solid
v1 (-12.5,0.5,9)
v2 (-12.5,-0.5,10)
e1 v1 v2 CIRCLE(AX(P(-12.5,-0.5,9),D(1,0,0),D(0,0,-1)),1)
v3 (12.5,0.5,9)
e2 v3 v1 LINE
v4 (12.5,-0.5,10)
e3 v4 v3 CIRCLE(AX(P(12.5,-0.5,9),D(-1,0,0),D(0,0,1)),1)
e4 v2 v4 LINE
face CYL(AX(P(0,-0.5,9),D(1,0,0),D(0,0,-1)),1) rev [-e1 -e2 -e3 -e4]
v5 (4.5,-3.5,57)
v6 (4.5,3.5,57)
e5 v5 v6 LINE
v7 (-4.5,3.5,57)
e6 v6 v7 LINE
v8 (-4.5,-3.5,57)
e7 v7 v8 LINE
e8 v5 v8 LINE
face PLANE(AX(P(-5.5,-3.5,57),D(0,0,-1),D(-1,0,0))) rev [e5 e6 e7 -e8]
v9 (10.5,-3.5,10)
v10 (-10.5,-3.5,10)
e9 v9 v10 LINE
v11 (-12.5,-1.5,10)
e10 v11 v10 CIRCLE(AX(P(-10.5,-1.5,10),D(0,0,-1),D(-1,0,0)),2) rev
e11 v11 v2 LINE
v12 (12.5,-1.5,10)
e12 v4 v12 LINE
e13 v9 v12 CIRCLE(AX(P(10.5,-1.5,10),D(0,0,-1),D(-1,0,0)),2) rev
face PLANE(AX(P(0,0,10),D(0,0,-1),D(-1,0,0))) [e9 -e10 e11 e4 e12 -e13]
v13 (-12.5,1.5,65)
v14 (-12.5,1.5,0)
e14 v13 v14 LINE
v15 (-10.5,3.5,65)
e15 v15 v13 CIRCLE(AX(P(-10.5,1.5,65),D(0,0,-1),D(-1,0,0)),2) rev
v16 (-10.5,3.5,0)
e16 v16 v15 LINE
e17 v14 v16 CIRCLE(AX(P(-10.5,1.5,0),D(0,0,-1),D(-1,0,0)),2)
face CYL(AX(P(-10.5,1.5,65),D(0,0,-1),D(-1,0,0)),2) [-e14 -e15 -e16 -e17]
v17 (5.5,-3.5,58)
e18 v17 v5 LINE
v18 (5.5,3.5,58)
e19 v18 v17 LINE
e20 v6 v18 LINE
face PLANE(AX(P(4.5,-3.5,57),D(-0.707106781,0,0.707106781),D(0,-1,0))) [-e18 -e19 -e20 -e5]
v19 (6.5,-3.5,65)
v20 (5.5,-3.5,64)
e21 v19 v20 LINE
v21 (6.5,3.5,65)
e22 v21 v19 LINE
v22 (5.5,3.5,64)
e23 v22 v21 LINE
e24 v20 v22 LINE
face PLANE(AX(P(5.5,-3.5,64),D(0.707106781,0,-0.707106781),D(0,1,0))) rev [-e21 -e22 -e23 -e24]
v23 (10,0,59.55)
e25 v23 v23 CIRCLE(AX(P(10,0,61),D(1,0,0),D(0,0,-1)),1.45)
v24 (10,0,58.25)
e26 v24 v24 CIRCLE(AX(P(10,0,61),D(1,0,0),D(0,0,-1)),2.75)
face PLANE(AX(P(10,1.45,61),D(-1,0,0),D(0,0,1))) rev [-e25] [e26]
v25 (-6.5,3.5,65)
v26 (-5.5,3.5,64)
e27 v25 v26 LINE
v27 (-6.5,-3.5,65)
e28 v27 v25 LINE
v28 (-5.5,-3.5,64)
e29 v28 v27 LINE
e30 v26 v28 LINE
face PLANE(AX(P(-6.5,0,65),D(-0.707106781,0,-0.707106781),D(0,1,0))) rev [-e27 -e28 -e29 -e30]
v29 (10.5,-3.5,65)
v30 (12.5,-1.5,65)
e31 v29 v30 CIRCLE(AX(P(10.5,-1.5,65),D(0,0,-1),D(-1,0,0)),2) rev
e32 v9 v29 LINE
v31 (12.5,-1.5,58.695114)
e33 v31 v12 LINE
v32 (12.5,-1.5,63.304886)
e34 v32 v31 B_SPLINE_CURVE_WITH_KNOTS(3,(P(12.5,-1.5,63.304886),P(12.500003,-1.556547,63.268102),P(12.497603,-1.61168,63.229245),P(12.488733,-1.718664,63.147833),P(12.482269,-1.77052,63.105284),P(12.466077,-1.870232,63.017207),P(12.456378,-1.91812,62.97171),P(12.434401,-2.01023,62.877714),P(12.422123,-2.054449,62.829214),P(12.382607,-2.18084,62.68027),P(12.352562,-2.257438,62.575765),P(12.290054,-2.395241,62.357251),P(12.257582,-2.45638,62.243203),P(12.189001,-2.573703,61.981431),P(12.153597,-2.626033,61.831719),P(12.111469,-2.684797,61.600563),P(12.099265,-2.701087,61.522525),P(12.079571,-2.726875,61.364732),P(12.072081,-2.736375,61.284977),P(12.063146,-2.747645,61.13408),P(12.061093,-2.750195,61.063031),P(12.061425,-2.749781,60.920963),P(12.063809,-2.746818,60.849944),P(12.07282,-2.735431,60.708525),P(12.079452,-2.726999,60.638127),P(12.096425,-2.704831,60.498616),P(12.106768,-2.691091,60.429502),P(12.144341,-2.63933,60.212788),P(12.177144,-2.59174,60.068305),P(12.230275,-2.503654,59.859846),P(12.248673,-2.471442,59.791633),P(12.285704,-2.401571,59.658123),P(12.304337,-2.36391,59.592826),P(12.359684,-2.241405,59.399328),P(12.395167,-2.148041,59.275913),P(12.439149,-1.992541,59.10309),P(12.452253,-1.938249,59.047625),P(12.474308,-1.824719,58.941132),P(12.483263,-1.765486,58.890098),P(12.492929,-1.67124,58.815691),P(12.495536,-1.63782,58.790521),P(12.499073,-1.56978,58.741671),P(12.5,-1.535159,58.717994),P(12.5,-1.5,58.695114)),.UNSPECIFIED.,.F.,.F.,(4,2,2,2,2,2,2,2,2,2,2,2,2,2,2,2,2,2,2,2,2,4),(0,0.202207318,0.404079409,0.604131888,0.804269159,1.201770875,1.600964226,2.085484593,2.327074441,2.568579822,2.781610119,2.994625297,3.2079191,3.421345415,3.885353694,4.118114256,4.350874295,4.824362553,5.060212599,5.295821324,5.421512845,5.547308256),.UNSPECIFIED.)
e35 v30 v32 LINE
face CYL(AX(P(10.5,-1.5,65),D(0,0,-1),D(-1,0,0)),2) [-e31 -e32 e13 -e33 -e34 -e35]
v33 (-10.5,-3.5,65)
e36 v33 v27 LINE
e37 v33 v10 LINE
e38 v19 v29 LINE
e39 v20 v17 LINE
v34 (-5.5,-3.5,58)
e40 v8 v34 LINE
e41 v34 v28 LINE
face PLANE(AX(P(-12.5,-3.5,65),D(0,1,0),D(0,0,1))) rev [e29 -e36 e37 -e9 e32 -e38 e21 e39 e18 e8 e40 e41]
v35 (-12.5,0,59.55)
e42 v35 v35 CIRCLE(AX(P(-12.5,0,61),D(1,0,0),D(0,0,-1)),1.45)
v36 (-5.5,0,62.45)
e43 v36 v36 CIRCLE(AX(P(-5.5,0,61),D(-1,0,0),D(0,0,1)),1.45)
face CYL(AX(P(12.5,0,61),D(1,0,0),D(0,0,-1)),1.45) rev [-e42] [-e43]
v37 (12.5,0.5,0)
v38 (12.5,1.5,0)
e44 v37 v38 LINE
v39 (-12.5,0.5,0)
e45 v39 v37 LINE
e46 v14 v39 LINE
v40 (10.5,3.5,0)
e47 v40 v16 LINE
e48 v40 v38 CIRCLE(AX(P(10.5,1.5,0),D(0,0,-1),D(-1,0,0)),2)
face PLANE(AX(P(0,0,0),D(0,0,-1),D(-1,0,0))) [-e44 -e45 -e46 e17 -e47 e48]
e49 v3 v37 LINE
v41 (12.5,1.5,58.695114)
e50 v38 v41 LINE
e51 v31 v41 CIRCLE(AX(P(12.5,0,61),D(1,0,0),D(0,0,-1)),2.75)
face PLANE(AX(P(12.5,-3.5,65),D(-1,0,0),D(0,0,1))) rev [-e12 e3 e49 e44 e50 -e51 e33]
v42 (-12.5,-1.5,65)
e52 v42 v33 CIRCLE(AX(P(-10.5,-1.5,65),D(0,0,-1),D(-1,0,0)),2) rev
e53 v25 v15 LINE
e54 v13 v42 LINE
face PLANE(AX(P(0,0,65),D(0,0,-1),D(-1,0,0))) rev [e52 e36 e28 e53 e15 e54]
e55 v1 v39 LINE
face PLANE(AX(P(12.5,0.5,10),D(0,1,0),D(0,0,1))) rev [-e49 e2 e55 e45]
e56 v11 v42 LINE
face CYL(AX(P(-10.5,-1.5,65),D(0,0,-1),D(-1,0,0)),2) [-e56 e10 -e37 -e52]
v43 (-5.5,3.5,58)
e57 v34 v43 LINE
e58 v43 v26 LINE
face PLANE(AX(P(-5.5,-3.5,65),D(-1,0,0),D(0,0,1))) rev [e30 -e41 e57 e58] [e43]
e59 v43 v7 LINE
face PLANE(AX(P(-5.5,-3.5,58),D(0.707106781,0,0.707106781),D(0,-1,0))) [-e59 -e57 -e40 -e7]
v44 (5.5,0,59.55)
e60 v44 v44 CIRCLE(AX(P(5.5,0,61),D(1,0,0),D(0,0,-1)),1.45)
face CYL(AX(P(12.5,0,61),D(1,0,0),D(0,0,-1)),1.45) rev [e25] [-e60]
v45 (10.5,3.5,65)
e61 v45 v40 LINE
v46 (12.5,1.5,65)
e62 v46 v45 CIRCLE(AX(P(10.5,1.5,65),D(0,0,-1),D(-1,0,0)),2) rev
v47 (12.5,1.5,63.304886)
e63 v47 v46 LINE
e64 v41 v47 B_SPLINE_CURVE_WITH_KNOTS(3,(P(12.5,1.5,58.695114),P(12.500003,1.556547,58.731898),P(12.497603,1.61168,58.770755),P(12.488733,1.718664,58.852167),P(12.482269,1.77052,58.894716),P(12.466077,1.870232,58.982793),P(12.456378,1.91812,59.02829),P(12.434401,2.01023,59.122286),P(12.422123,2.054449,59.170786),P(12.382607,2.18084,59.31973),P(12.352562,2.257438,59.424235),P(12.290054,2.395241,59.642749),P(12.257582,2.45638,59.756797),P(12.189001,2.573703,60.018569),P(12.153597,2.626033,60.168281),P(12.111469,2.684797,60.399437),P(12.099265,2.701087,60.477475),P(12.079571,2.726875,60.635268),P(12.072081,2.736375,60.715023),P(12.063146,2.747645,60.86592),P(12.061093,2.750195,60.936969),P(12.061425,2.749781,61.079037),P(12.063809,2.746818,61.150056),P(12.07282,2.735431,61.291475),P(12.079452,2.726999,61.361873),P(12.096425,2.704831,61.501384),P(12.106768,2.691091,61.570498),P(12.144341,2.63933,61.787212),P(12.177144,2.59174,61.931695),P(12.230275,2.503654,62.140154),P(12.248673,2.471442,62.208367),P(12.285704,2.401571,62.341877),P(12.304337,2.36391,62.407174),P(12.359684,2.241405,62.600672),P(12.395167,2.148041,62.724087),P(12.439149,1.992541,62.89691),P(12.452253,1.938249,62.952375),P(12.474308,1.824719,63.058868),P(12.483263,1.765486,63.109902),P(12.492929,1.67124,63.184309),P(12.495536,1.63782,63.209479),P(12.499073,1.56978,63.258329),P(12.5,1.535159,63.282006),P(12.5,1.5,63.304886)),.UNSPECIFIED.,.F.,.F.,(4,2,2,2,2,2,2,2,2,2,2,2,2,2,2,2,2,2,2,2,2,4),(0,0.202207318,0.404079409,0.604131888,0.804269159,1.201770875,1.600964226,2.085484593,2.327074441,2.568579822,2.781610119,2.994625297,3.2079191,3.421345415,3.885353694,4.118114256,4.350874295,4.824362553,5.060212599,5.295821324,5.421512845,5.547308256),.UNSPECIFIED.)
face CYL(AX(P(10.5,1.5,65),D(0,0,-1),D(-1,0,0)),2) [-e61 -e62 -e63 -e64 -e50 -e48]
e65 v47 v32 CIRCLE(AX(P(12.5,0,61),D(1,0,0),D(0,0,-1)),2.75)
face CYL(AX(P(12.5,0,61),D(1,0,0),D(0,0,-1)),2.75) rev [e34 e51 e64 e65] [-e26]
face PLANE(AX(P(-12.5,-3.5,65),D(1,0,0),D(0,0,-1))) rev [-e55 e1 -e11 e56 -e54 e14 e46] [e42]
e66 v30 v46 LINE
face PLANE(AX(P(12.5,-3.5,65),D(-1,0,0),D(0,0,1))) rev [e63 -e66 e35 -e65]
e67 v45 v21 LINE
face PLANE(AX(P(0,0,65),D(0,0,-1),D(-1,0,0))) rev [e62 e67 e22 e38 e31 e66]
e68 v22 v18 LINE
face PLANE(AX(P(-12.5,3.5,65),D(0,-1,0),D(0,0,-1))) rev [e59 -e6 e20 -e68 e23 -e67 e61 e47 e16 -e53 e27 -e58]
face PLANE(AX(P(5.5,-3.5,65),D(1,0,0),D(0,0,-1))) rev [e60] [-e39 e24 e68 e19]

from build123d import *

# Parameters (mm, degrees)
SKETCH1_W                        = 25
SKETCH1_H                        = 7
BOSS_EXTRUDE1_DEPTH              = 65
SKETCH2_W                        = 11
SKETCH2_H                        = 8
CUT_EXTRUDE1_DEPTH               = 67.560123197
CHAMFER1_SIZE                    = 1
CBORE_FOR_M2_5_SHCS2_D           = 2.9
CBORE_FOR_M2_5_SHCS2_CBORE_D     = 5.5
CBORE_FOR_M2_5_SHCS2_CBORE_DEPTH = 2.5
FILLET1_R                        = 2
CHAMFER2_SIZE                    = 1
SKETCH10_W                       = 25
SKETCH10_H                       = 4
CUT_EXTRUDE2_DEPTH               = 10
FILLET2_R                        = 1


with BuildPart() as part:
    # Sketch1 → Boss-Extrude1 (new body)
    with BuildSketch(Plane.XY):
        Rectangle(SKETCH1_W, SKETCH1_H)
    extrude(amount=BOSS_EXTRUDE1_DEPTH)

    # Sketch2 → Cut-Extrude1 (cut, through all)
    with BuildSketch(Plane(origin=(0, 3.5, 0), x_dir=(1, 0, 0), z_dir=(0, 1, 0))):
        with Locations((0, -61)):
            Rectangle(SKETCH2_W, SKETCH2_H)
    extrude(amount=-CUT_EXTRUDE1_DEPTH, mode=Mode.SUBTRACT)

    # Chamfer1
    chamfer1_edges = [part.edges().sort_by_distance(p)[0] for p in [
        (-5.5, 0, 57),
        (5.5, 0, 57),
    ]]
    chamfer(chamfer1_edges, length=CHAMFER1_SIZE)

    # CBORE for M2.5 SHCS2 (through all)
    with Locations(Plane(origin=(12.5, -6.575007997, 116.706532938), x_dir=(0, 0, -1), z_dir=(1, 0, 0))):
        with Locations((55.706532938, 6.575007997)):
            CounterBoreHole(CBORE_FOR_M2_5_SHCS2_D / 2, CBORE_FOR_M2_5_SHCS2_CBORE_D / 2, CBORE_FOR_M2_5_SHCS2_CBORE_DEPTH)

    # Fillet1
    # the kernel refuses this fillet: 2 mm, written as the material it takes off along each edge
    with BuildSketch(Plane(origin=(12.5, -3.5, -5), x_dir=(-1, 0, 0), z_dir=(0, 0, 1)), Plane(origin=(12.5, 3.5, -5), x_dir=(0, -1, 0), z_dir=(0, 0, 1))) as fillet1_piece_1:
        with BuildLine():
            CenterArc((FILLET1_R, -FILLET1_R), FILLET1_R, 90, 90)
            Line((0, -FILLET1_R), (0, 0))
            Line((0, 0), (FILLET1_R, 0))
        make_face()
    extrude(amount=75, mode=Mode.SUBTRACT)
    with BuildSketch(Plane(origin=(-12.5, -3.5, -5), x_dir=(1, 0, 0), z_dir=(0, 0, 1)), Plane(origin=(-12.5, 3.5, -5), x_dir=(0, -1, 0), z_dir=(0, 0, 1))) as fillet1_piece_2:
        with BuildLine():
            CenterArc((FILLET1_R, FILLET1_R), FILLET1_R, 180, 90)
            Line((0, FILLET1_R), (0, 0))
            Line((0, 0), (FILLET1_R, 0))
        make_face()
    extrude(amount=75, mode=Mode.SUBTRACT)

    # Chamfer2
    chamfer2_edges = [part.edges().sort_by_distance(p)[0] for p in [
        (-5.5, 0, 65),
        (5.5, 0, 65),
    ]]
    chamfer(chamfer2_edges, length=CHAMFER2_SIZE)

    # Sketch10 → Cut-Extrude2 (cut)
    with BuildSketch(Plane(origin=(0, 0, 0), x_dir=(-1, 0, 0), z_dir=(0, 0, -1))):
        with Locations((0, -1.5)):
            Rectangle(SKETCH10_W, SKETCH10_H)
    extrude(amount=-CUT_EXTRUDE2_DEPTH, mode=Mode.SUBTRACT)

    # Fillet2
    fillet2_edges = [part.edges().sort_by_distance(p)[0] for p in [
        (0, 0.5, 10),
    ]]
    fillet(fillet2_edges, radius=FILLET2_R)


solid = part.part
